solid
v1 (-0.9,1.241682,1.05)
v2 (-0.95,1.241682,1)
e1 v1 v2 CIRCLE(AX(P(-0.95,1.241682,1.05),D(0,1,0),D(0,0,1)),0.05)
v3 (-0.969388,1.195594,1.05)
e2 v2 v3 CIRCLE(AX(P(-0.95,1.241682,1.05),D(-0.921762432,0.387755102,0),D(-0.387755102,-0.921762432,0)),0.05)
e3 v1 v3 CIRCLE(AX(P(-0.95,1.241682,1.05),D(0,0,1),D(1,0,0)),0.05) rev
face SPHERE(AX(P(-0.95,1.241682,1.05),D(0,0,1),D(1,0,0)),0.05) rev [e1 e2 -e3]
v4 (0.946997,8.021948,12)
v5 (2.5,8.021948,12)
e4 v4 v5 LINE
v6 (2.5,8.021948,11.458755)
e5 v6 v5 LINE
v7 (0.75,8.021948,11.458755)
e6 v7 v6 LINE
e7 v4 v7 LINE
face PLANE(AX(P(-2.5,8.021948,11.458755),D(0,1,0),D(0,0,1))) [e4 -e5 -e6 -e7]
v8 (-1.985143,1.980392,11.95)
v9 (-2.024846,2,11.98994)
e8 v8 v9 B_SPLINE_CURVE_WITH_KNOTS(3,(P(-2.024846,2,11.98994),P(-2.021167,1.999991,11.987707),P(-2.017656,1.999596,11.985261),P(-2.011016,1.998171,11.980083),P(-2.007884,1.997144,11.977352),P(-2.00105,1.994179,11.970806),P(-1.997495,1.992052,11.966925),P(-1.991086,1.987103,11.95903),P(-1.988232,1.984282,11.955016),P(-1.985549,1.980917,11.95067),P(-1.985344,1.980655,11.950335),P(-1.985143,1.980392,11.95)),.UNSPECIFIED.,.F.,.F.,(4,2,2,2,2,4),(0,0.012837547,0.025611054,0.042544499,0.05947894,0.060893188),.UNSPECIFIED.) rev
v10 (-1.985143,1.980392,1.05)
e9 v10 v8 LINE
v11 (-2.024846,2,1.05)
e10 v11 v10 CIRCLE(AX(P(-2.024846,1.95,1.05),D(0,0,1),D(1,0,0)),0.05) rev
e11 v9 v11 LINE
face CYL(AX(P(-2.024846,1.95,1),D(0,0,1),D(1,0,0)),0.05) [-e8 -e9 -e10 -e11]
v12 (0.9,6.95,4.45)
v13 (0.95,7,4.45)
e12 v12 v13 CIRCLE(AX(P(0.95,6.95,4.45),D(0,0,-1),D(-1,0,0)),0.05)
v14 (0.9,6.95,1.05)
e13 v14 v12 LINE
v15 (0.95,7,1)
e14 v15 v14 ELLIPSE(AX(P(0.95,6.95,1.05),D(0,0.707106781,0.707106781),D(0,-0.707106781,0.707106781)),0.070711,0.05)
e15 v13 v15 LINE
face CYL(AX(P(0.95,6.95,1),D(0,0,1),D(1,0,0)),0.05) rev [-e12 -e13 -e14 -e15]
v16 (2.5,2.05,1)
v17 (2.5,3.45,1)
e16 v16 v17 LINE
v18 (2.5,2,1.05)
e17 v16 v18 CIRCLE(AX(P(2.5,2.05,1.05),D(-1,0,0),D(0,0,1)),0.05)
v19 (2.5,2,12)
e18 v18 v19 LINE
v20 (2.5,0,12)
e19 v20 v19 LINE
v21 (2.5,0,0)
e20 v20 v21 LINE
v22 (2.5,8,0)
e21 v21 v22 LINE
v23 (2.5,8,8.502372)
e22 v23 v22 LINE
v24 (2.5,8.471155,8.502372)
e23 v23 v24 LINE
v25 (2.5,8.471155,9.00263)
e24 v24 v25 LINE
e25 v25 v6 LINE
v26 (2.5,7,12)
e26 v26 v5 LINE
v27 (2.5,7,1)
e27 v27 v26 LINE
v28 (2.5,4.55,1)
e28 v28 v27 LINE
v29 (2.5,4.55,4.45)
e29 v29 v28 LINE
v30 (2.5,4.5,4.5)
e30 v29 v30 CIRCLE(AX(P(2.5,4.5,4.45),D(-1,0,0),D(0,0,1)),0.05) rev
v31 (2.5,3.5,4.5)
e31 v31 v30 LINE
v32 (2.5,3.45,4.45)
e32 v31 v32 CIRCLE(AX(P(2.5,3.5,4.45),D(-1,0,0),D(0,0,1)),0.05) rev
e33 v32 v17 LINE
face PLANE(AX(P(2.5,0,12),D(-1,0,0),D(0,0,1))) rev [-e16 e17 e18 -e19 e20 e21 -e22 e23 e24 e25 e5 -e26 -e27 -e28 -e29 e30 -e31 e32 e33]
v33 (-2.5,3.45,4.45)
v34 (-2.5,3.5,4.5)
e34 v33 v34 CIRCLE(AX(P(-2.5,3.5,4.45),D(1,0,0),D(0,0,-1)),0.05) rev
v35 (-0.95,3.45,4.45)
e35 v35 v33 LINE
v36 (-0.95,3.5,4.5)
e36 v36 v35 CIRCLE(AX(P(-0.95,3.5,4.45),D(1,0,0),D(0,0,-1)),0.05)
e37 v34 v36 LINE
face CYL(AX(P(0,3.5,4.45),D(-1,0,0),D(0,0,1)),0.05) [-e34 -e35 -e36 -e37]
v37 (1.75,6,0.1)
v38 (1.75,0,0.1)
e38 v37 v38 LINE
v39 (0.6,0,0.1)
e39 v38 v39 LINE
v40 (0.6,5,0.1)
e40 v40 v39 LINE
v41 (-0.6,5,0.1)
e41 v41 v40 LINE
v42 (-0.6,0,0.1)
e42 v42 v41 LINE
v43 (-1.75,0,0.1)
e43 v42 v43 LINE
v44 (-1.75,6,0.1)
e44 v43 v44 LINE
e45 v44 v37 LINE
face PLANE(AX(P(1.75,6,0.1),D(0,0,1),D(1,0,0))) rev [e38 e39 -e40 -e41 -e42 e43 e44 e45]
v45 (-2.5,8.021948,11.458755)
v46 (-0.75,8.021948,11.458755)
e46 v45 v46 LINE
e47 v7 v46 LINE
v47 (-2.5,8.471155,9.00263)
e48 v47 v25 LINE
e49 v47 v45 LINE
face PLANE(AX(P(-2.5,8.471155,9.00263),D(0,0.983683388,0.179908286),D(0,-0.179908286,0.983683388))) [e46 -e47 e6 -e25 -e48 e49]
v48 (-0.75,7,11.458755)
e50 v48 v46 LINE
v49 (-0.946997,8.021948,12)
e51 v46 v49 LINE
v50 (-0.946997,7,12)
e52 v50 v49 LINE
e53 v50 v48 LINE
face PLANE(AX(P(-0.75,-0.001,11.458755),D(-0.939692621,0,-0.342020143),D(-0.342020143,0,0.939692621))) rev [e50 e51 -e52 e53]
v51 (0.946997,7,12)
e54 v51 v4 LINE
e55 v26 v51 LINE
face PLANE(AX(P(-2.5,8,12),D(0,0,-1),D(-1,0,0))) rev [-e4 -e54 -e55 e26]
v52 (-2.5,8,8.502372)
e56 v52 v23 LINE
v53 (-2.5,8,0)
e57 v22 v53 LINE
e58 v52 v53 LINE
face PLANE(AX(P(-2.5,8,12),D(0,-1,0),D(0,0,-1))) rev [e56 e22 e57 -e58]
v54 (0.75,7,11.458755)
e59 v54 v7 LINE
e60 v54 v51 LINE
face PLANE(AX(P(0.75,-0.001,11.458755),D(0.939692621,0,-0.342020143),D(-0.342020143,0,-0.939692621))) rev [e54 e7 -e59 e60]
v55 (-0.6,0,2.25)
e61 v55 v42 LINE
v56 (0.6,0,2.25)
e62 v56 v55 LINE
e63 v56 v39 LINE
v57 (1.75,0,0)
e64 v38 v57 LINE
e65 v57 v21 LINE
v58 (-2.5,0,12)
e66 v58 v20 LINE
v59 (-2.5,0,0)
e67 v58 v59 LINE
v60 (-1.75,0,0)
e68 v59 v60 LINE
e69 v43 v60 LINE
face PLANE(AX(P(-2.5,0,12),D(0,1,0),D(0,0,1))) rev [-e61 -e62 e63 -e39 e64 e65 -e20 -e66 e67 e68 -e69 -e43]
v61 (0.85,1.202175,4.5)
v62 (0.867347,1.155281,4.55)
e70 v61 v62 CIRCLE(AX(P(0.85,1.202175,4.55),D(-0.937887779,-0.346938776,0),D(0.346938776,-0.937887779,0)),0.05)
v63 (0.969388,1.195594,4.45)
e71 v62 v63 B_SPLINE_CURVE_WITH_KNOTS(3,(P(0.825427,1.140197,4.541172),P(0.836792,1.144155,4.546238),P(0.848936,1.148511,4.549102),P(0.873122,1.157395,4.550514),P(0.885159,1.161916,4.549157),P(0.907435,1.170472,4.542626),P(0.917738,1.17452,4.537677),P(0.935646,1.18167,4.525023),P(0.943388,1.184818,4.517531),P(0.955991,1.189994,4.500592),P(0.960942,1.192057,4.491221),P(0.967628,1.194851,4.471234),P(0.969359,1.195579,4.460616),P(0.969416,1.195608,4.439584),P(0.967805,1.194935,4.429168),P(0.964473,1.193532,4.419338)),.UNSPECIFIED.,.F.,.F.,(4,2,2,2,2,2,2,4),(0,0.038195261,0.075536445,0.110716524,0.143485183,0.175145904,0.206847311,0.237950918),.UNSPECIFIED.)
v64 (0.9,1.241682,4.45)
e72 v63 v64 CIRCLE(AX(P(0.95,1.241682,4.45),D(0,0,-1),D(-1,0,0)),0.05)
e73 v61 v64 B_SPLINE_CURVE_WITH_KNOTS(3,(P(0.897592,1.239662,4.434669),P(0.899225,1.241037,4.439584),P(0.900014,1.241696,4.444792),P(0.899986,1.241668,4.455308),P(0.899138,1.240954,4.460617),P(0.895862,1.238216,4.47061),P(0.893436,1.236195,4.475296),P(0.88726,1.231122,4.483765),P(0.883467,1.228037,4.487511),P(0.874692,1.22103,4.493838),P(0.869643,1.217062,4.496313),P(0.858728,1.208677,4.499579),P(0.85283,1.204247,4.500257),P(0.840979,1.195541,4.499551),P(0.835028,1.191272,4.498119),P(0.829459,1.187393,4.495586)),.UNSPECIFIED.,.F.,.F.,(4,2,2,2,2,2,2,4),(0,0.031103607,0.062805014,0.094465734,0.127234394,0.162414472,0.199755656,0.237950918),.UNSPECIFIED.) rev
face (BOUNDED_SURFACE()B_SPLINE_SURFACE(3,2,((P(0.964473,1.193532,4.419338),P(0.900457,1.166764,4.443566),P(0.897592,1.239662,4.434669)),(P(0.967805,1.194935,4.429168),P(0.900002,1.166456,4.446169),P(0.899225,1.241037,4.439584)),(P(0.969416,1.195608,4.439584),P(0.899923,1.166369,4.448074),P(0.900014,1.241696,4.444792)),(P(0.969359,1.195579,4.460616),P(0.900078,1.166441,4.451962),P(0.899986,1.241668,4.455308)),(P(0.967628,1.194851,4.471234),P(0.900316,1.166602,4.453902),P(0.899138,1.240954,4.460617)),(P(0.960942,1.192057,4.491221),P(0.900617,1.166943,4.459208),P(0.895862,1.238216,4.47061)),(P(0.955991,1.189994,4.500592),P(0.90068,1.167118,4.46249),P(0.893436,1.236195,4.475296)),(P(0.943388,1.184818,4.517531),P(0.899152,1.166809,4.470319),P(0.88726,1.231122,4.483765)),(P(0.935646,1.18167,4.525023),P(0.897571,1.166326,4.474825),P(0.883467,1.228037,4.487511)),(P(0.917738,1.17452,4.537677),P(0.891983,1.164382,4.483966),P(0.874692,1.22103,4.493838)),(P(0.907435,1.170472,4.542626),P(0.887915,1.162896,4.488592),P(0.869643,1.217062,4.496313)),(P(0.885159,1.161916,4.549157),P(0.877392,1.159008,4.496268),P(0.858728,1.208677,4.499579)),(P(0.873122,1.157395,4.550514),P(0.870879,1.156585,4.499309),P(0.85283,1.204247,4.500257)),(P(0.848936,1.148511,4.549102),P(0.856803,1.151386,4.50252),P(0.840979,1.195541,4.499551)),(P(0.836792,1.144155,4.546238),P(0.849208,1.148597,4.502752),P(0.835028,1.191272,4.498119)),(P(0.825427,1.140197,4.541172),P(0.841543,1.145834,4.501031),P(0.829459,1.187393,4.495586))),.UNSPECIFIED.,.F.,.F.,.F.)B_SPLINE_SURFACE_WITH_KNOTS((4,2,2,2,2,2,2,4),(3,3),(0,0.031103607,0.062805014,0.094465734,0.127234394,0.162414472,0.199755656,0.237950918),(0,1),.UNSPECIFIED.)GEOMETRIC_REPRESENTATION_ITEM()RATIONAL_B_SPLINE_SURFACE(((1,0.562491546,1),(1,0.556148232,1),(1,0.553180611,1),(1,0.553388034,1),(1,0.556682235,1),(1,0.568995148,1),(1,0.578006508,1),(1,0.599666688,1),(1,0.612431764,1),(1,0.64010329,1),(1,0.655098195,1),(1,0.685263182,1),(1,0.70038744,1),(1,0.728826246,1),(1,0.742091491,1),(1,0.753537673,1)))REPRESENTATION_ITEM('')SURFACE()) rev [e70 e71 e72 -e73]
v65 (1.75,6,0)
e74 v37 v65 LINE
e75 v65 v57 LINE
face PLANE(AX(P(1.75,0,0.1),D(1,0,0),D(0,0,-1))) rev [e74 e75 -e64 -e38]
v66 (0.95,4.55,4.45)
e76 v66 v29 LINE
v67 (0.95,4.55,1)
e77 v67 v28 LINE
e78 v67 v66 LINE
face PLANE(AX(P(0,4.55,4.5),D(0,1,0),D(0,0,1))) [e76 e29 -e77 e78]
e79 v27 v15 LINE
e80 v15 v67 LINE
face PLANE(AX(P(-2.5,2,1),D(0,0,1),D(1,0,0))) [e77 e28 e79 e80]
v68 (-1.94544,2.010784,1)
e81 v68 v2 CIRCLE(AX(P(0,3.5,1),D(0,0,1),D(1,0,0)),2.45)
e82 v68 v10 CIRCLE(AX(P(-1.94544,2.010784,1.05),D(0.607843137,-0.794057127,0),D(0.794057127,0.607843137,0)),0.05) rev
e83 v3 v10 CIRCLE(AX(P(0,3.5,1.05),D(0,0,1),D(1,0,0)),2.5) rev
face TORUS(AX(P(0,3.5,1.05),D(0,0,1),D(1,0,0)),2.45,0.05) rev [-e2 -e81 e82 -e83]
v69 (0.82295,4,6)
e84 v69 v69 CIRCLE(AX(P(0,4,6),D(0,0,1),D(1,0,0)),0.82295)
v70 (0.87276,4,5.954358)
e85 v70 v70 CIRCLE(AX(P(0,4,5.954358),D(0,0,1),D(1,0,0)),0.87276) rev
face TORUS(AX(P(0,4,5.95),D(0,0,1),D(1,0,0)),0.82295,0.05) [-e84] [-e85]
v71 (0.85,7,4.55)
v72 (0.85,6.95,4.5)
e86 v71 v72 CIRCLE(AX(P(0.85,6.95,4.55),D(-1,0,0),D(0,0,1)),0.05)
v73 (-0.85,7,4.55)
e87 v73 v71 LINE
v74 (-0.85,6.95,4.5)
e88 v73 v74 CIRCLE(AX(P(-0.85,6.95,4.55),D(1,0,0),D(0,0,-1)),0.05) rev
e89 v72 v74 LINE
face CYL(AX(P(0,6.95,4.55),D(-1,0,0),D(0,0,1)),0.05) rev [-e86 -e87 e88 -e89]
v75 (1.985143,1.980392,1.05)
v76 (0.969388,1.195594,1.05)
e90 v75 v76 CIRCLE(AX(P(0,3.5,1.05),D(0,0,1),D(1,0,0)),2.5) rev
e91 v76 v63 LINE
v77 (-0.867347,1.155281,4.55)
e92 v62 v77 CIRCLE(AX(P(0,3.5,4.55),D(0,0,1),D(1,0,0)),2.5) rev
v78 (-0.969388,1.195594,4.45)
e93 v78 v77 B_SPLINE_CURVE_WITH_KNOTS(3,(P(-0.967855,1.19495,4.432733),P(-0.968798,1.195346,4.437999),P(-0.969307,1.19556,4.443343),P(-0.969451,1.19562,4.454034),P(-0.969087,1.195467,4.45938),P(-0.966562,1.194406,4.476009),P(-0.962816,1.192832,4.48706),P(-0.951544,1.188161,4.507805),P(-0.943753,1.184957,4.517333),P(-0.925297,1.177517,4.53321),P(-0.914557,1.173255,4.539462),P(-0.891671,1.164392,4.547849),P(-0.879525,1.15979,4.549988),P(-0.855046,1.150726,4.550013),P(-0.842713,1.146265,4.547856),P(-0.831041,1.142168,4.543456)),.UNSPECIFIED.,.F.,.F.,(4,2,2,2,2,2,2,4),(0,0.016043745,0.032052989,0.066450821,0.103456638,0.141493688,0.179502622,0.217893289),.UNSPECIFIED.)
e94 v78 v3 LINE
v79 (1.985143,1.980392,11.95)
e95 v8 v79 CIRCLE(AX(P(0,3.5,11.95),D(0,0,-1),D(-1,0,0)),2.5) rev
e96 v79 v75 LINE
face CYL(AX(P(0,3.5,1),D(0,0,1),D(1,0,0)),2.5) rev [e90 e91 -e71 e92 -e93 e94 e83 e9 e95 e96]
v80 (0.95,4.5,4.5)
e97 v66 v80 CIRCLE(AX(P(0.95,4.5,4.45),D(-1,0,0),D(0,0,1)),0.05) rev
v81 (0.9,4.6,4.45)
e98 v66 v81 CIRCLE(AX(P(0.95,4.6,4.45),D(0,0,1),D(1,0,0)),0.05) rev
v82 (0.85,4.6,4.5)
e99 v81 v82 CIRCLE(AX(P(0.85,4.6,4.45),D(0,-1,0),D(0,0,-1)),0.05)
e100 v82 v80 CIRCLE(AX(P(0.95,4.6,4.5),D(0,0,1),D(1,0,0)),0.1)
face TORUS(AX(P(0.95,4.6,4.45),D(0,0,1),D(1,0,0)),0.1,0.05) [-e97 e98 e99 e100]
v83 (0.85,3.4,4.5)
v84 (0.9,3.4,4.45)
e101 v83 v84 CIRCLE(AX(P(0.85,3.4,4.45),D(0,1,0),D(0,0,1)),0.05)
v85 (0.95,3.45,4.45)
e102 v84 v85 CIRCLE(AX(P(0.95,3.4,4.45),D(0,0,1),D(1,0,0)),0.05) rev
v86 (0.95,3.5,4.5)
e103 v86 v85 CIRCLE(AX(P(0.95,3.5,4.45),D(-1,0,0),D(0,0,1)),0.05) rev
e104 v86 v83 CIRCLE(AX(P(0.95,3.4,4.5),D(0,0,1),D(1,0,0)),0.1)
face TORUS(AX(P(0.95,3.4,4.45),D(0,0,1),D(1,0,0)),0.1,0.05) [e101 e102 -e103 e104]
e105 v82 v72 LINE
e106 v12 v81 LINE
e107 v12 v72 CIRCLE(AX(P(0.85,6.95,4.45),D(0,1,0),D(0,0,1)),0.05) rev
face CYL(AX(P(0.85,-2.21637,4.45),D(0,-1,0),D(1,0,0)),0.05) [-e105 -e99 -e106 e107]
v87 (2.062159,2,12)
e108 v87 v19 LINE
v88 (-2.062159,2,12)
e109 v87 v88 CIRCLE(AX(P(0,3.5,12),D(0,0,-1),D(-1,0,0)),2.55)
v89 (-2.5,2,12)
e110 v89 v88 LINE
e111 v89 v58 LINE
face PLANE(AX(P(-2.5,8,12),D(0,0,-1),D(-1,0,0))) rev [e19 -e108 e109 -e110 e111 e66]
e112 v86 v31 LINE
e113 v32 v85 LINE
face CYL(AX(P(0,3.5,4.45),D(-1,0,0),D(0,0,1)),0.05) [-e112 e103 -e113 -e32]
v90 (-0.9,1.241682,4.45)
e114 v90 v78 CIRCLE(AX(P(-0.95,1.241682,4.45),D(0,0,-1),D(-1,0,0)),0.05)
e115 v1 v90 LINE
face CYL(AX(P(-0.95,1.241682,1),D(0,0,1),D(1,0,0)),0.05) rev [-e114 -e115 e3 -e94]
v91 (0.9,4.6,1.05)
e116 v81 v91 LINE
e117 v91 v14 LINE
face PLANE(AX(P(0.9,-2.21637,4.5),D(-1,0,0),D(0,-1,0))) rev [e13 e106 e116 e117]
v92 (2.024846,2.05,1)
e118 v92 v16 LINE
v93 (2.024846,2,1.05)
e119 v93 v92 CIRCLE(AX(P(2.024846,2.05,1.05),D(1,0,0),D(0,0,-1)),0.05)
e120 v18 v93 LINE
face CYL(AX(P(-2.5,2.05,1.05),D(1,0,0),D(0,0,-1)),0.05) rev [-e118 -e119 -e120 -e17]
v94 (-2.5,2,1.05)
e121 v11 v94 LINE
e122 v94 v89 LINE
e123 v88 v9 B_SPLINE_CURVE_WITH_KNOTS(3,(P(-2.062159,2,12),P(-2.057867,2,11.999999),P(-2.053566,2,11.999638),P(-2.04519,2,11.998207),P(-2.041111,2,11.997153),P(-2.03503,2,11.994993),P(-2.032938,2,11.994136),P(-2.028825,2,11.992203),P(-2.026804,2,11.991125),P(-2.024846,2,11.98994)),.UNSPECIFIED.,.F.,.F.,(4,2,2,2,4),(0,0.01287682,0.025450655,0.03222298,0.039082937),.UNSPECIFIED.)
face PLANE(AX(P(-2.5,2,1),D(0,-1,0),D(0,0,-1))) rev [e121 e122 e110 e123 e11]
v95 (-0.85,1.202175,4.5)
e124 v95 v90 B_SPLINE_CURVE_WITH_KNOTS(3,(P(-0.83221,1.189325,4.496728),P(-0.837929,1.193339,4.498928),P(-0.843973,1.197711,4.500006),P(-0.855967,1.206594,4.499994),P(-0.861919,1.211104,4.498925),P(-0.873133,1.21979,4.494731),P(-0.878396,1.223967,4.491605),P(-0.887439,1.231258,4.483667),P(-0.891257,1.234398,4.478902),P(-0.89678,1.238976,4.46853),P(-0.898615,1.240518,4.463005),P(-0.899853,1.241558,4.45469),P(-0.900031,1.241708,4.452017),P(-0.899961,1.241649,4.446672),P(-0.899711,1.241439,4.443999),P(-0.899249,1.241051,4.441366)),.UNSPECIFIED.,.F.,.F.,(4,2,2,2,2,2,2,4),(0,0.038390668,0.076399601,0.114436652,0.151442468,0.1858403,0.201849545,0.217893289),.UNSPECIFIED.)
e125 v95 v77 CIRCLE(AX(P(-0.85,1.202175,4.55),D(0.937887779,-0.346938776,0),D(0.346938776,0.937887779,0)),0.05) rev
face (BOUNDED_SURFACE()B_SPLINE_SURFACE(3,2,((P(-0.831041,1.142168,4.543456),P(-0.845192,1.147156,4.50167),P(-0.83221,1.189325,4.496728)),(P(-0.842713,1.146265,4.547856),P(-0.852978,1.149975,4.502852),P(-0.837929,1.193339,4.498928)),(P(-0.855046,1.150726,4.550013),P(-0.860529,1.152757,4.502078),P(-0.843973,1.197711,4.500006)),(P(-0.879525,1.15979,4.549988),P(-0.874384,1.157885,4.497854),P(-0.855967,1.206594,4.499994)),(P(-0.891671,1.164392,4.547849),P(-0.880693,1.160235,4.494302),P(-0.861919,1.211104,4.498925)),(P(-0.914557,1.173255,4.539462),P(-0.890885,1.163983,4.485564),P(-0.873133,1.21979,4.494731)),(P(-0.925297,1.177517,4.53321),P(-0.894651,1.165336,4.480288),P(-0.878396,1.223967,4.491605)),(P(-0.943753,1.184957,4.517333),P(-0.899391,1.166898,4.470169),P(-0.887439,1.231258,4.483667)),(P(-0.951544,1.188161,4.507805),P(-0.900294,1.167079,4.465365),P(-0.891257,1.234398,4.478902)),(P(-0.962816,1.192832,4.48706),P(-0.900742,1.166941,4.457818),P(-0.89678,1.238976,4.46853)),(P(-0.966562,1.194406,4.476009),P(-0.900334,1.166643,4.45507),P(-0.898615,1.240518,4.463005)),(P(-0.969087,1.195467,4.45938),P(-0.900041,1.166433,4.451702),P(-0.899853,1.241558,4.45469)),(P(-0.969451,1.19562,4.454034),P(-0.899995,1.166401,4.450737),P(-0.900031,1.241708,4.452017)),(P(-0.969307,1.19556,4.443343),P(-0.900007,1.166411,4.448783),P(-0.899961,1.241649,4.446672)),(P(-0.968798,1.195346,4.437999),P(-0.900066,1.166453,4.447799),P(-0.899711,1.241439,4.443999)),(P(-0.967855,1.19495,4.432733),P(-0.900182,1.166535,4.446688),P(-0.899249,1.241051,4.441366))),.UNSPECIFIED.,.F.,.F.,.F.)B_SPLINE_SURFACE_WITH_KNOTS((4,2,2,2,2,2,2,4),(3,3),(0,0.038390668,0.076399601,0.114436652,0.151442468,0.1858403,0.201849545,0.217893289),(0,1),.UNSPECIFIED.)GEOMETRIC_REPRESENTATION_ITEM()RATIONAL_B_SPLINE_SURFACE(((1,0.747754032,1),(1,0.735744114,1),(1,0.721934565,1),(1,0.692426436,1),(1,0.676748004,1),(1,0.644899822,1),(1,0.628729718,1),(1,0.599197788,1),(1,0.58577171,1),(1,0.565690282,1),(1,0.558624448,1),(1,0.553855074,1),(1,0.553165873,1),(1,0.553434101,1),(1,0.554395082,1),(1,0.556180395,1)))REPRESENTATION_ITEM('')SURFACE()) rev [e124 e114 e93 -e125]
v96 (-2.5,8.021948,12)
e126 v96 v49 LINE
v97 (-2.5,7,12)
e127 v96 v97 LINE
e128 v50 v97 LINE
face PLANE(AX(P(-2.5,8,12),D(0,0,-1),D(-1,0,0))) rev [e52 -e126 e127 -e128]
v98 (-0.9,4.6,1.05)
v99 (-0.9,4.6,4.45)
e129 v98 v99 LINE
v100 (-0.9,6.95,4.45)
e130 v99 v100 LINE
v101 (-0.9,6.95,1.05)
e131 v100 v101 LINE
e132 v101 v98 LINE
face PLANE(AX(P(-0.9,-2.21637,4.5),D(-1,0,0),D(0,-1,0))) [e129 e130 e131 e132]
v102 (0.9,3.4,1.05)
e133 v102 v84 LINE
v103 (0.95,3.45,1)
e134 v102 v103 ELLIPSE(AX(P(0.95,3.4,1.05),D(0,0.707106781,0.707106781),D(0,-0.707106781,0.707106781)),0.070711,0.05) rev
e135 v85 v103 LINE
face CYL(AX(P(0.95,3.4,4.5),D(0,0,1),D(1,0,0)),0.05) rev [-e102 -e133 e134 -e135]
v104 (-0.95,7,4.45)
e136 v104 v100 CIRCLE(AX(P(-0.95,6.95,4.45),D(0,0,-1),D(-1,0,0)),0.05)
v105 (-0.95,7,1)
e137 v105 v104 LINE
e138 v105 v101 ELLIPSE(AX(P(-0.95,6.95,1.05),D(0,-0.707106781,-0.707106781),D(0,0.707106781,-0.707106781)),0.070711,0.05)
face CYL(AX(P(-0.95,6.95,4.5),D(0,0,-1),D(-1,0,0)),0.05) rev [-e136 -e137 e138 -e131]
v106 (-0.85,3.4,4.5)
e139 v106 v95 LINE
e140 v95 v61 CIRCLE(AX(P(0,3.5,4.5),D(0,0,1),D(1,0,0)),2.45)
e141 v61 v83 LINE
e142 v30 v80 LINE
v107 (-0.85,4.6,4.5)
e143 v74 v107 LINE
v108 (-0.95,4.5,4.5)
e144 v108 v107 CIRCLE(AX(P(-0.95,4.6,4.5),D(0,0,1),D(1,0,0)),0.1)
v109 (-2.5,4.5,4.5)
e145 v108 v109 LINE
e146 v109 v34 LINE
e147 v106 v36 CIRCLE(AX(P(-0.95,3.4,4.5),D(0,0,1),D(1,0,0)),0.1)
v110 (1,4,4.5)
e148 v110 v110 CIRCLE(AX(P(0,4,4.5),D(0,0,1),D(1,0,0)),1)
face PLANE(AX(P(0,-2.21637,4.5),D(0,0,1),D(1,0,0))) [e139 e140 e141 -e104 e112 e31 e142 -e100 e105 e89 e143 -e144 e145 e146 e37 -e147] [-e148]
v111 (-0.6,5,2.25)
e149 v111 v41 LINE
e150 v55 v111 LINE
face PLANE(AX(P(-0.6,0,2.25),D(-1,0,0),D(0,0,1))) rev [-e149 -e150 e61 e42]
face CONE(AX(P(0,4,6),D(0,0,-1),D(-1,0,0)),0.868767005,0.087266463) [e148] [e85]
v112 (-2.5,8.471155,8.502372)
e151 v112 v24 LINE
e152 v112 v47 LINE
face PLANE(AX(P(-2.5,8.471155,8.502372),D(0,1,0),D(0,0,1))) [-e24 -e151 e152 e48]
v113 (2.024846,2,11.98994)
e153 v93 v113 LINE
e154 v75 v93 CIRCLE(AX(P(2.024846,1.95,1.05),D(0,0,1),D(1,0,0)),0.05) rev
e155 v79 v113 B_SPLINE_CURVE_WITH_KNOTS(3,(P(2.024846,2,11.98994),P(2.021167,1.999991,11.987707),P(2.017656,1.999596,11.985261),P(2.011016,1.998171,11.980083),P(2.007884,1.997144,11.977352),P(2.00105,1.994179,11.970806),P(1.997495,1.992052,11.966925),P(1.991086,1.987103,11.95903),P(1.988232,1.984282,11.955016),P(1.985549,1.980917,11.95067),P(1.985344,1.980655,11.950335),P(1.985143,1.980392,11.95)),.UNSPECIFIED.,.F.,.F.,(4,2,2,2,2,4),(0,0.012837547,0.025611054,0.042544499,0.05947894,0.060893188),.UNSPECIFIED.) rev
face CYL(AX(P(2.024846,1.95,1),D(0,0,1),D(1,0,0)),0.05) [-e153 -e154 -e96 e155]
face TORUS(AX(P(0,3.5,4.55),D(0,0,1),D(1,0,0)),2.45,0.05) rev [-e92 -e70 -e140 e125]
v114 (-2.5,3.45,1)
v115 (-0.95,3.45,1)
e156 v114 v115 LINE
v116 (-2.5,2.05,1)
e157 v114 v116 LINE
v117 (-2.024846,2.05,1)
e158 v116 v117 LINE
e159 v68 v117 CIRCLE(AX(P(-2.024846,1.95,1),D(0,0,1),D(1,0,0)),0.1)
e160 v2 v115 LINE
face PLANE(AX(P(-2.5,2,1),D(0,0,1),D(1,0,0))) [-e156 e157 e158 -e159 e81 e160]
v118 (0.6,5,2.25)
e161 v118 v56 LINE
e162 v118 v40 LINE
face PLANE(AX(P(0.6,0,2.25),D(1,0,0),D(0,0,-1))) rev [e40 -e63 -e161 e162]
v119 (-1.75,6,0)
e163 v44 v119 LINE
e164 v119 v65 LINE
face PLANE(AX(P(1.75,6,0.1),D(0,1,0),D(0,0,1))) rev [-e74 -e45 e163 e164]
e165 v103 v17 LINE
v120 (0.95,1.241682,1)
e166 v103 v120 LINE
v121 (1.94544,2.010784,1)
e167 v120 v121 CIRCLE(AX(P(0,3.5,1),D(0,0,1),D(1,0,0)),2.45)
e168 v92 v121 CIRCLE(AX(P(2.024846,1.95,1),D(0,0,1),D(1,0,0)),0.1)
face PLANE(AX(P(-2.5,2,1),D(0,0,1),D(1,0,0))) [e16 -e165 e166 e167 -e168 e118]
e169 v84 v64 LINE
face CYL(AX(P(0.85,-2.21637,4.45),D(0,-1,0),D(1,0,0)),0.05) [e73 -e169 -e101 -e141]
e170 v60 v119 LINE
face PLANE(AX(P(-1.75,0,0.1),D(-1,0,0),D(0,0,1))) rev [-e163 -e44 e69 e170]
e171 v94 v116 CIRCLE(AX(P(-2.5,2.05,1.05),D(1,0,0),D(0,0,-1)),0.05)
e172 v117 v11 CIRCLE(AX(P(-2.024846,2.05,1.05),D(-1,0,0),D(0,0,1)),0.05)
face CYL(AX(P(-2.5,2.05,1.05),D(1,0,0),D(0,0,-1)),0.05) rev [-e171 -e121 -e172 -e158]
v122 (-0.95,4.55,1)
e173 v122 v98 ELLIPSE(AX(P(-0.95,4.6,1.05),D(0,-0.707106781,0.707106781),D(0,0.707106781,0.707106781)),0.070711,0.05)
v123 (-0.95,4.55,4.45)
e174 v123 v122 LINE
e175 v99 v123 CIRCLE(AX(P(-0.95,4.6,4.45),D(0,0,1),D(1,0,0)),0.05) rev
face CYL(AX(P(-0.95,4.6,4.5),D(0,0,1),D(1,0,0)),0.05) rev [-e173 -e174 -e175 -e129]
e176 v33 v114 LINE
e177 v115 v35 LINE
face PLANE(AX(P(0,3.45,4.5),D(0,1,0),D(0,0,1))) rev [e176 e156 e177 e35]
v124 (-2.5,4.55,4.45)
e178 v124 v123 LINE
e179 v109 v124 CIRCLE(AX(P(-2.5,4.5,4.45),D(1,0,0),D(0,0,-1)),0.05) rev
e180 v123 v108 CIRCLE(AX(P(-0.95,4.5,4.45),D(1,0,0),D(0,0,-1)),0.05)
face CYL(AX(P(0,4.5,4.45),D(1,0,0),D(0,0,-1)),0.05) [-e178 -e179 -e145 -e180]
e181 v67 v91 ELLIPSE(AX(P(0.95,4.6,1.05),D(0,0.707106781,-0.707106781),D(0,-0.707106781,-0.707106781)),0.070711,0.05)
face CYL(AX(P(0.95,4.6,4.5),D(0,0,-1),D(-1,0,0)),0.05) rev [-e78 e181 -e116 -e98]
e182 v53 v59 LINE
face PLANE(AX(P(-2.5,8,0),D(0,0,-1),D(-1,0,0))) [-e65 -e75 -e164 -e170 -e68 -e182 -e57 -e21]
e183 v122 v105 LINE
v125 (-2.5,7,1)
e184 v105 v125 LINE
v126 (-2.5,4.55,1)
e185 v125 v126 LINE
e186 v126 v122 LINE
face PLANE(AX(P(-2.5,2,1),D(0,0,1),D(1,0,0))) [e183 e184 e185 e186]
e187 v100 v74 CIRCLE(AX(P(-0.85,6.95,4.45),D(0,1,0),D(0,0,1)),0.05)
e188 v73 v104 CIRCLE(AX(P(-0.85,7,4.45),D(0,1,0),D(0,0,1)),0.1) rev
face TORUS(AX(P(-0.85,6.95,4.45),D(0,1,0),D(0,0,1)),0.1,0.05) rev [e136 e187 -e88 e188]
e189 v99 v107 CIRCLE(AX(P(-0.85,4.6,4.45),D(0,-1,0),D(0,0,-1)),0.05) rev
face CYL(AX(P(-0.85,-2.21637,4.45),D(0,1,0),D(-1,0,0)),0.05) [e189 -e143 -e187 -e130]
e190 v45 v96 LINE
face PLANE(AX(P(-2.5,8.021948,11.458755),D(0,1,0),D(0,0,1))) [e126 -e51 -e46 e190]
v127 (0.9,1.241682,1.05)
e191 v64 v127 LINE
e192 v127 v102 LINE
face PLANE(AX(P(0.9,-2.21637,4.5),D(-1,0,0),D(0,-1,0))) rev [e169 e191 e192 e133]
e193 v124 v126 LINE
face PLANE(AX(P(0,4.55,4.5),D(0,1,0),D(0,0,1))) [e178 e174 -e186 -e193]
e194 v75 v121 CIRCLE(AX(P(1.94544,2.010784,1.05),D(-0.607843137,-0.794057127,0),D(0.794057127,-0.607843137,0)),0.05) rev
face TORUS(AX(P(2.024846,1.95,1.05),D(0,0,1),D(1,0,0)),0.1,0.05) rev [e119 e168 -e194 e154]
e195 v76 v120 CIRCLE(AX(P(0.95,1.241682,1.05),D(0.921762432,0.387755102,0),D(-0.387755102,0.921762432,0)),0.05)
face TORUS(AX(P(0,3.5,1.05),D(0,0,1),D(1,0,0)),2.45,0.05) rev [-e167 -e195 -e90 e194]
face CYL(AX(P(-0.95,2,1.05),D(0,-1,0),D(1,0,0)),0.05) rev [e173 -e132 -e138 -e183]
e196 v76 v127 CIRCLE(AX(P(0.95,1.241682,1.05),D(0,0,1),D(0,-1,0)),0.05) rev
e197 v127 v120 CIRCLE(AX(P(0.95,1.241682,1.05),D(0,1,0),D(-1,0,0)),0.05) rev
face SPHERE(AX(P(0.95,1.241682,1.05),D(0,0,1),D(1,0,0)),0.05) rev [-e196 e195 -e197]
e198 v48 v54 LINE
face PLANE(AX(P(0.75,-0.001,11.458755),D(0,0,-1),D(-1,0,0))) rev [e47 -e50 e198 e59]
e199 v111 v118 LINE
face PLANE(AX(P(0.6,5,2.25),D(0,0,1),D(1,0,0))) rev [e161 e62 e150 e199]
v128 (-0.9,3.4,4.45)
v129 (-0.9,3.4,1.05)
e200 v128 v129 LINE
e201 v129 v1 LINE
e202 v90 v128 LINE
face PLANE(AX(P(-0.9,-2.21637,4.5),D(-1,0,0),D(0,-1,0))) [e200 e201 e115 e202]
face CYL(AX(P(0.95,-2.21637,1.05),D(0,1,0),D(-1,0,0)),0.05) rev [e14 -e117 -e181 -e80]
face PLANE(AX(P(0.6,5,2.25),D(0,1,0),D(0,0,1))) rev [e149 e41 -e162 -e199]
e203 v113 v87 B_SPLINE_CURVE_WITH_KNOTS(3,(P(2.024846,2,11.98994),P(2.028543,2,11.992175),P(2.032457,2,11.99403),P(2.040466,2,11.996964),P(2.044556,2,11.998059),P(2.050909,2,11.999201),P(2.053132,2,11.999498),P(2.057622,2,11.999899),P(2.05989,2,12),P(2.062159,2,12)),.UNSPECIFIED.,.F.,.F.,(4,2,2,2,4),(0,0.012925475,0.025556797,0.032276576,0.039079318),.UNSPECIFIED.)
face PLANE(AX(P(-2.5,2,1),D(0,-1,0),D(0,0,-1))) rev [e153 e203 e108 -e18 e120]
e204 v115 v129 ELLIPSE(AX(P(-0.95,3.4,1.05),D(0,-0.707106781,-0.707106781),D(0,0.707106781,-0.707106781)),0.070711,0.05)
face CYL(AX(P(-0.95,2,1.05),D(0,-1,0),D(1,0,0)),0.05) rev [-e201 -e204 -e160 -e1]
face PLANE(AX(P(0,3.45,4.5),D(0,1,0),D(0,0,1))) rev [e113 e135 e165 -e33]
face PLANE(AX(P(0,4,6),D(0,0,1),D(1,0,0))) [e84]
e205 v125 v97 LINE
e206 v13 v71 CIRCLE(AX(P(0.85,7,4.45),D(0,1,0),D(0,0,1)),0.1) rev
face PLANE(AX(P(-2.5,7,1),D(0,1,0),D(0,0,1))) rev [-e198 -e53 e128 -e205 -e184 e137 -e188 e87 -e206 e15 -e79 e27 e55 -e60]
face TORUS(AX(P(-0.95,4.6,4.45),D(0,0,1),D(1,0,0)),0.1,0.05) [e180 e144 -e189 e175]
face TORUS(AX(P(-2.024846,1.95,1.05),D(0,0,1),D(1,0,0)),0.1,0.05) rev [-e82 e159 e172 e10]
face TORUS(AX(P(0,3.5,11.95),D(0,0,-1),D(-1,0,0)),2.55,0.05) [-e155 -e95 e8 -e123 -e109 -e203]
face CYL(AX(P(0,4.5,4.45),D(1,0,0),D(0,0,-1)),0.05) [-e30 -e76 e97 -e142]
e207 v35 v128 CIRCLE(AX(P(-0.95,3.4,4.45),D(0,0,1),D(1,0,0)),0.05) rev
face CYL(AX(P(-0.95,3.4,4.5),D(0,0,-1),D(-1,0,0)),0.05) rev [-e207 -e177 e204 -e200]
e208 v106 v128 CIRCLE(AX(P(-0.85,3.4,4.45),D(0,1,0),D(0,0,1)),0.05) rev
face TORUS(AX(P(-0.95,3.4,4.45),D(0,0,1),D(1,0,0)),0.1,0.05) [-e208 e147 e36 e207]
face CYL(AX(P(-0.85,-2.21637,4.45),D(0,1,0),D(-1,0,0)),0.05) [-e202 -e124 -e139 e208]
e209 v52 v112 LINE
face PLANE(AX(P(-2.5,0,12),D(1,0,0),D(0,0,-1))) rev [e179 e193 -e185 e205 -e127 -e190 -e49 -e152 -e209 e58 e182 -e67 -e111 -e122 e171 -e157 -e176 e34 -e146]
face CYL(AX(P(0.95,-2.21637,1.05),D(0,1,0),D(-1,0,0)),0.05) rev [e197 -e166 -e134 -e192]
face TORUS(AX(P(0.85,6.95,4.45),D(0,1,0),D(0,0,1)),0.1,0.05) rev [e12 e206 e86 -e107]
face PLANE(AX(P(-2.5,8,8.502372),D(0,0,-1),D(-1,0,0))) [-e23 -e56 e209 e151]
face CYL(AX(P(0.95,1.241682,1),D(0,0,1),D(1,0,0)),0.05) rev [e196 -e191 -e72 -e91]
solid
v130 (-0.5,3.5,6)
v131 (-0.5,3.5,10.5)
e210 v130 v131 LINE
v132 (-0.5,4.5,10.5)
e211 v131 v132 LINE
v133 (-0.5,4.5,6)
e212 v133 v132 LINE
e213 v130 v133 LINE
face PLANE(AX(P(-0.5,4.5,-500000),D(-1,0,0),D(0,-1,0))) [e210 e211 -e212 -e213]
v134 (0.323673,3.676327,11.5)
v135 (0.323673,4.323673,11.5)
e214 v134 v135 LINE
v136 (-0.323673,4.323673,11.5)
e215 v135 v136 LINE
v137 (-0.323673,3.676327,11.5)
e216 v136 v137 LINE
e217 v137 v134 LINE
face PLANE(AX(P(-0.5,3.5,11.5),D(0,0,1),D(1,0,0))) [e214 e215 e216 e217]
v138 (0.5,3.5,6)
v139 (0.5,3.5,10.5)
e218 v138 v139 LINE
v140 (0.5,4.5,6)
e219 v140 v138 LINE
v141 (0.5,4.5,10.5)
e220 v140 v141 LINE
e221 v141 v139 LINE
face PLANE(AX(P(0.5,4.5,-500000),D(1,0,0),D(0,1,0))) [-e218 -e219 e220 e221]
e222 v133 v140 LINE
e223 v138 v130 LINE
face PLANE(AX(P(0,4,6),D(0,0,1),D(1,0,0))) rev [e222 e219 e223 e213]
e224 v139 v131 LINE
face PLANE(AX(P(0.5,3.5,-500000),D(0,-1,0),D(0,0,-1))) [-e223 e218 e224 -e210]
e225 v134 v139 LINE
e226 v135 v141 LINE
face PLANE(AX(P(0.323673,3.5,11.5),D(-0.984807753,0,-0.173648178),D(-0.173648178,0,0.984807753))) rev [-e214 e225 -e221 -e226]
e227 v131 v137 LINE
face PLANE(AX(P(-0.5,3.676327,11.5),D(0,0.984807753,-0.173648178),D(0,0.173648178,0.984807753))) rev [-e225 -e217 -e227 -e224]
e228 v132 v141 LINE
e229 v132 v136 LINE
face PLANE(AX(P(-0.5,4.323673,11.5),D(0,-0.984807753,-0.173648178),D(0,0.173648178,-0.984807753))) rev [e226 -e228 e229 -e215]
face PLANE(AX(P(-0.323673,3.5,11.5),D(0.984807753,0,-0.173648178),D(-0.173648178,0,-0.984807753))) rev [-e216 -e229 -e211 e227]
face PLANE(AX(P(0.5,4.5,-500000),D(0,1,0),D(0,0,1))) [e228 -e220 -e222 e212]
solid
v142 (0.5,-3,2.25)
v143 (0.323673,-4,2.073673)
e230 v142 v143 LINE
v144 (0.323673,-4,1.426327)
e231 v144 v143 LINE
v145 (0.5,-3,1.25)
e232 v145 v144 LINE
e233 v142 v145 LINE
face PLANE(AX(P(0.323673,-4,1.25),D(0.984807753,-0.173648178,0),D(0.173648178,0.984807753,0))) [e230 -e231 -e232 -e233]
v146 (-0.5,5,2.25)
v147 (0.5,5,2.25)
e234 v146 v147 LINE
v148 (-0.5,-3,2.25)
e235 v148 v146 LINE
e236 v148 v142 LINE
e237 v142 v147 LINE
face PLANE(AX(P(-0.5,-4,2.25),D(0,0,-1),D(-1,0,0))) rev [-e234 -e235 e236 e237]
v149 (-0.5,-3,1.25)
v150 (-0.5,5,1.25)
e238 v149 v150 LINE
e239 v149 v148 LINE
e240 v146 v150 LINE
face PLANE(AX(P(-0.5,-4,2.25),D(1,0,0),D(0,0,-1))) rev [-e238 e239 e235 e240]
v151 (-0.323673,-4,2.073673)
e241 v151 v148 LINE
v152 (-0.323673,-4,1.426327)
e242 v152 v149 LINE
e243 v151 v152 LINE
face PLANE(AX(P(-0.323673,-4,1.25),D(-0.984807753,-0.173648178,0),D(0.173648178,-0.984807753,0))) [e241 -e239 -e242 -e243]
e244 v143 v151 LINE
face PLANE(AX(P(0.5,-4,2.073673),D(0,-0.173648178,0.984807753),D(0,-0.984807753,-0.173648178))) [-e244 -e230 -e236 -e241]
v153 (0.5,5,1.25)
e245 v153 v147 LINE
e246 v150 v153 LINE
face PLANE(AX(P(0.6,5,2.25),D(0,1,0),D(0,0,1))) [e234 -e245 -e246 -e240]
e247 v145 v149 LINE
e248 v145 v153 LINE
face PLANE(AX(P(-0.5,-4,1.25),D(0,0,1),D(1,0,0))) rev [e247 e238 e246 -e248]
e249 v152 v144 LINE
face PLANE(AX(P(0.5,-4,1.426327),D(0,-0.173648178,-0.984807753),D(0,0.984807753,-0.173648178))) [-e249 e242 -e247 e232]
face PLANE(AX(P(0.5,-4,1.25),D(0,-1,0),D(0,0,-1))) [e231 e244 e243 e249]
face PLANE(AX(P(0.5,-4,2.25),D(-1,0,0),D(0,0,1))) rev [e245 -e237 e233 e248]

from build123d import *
from OCP.BRepFilletAPI import BRepFilletAPI_MakeChamfer

# Parameters (mm, degrees)
SKETCH_1_W                   = 5
SKETCH_1_H                   = 8
EXTRUDE_1_DEPTH              = 12
SKETCH_2_W                   = 5
SKETCH_2_H                   = 5
CUT_EXTRUDE_2_DEPTH          = 11
SKETCH_5_R                   = 2.5
CUT_EXTRUDE_3_DEPTH          = 11
EXTRUDE_START                = 3.5
SKETCH_13_W                  = 1.8
SKETCH_13_H                  = 1.1
SKETCH_13_H_2                = 2.45
SKETCH_13_W_2                = 1.6
EXTRUDE_13_DEPTH             = 3.5
SKETCH_14_R                  = 1
EXTRUDE_14_DEPTH             = 1.5
CHAMFER_1_SIZE               = 1.5
CHAMFER_1_SIZE_2             = 0.131232995
EXTRUDE_15_DEPTH             = 5
CUT_EXTRUDE_16_REACH         = 16.649
SKETCH_17_W                  = 1.2
SKETCH_17_H                  = 5
CUT_EXTRUDE_17_DEPTH         = 2.25
SKETCH_18_W                  = 3.5
SKETCH_18_H                  = 6
CUT_EXTRUDE_18_DEPTH         = 0.1
EXTRUDE_19_REACH             = 16.9
SKETCH_6_W                   = 1
SKETCH_6_H                   = 1
SKETCH_19_W                  = 1
SKETCH_19_H                  = 1
CUT_EXTRUDE_20_DEPTH         = 0.5
EXTRUDE_22_REACH             = 16.9
SKETCH_9_W                   = 1
SKETCH_9_H                   = 1
EXTRUDE_22_DIRECTION_2_DEPTH = 4
CHAMFER_2_SIZE               = 1
CHAMFER_2_SIZE2              = 0.176326981
CHAMFER_3_SIZE               = 1
CHAMFER_3_SIZE2              = 0.176326981
FILLET_3_R                   = 0.05


with BuildPart() as part:
    # Эскиз1 → Вытянуть1 (new body)
    with BuildSketch(Plane.XY):
        with Locations((0, 4)):
            Rectangle(SKETCH_1_W, SKETCH_1_H)
    extrude(amount=EXTRUDE_1_DEPTH)

    # Эскиз2 → Вытянуть2 (cut)
    with BuildSketch(Plane.XY.offset(12)):
        with Locations((0, 4.5)):
            Rectangle(SKETCH_2_W, SKETCH_2_H)
    extrude(amount=-CUT_EXTRUDE_2_DEPTH, mode=Mode.SUBTRACT)

    # Эскиз5 → Вытянуть3 (cut)
    with BuildSketch(Plane.XY.offset(12)):
        with Locations((0, 3.5)):
            Circle(SKETCH_5_R)
    extrude(amount=-CUT_EXTRUDE_3_DEPTH, mode=Mode.SUBTRACT)

    # Эскиз13 → Вытянуть13 (add)
    with BuildSketch(Plane.XY.offset(1).offset(EXTRUDE_START)):
        with Locations((0, 4)):
            Rectangle(SKETCH_13_W, SKETCH_13_H)
        with Locations((0, 5.775)):
            Rectangle(SKETCH_13_W, SKETCH_13_H_2)
        with Locations((-1.7, 4)):
            Rectangle(SKETCH_13_W_2, SKETCH_13_H)
        with BuildLine():
            ThreePointArc((-0.9, 1.167619242), (-0.457737974, 1.042262026), (0, 1))
            ThreePointArc((0, 1), (0.457737974, 1.042262026), (0.9, 1.167619242))
            Line((0.9, 1.167619242), (0.9, 3.45))
            Line((0.9, 3.45), (-0.9, 3.45))
            Line((-0.9, 3.45), (-0.9, 1.167619242))
        make_face()
        with Locations((1.7, 4)):
            Rectangle(SKETCH_13_W_2, SKETCH_13_H)
    extrude(amount=-EXTRUDE_13_DEPTH)

    # Эскиз14 → Вытянуть14 (add)
    with BuildSketch(Plane.XY.offset(4.5)):
        with Locations((0, 4)):
            Circle(SKETCH_14_R)
    extrude(amount=EXTRUDE_14_DEPTH)

    # Фаска1
    # the kernel refuses this chamfer: 1.5, 0.131232995 mm, written as the material it takes off along each edge
    with BuildSketch(Plane(origin=(0, 4, 6), x_dir=(1, 0, 0), z_dir=(0, -1, 0))) as chamfer_1_piece_1_section:
        Polygon((1, -CHAMFER_1_SIZE), (1 - CHAMFER_1_SIZE_2 * 1.0000000022, 0), (1, 0), align=None)
    chamfer_1_piece_1 = revolve(axis=Axis((0, 4, 6), (0, 0, 1)), mode=Mode.PRIVATE)
    chamfer_1_piece_1 = split(chamfer_1_piece_1, bisect_by=Plane(origin=(-0.941450204, 4, 4.5), z_dir=(0, 0, 1)), keep=Keep.TOP, mode=Mode.PRIVATE)
    add(chamfer_1_piece_1, mode=Mode.SUBTRACT)

    # Эскиз15 → Вытянуть15 (add)
    with BuildSketch(Plane(origin=(2.5, 0, 0), x_dir=(0, 0, -1), z_dir=(1, 0, 0))):
        Polygon((-12, 8), (-8.502371568, 8), (-8.502371568, 8.471155216), (-9.002629656, 8.471155216), (-11.45875482, 8.021948415), (-12, 8.021948415), align=None)
    extrude(amount=-EXTRUDE_15_DEPTH)

    # Эскиз16 → Вытянуть16 (cut, up to next)
    with BuildSketch(Plane(origin=(0, 8.021948415, 0), x_dir=(1, 0, 0), z_dir=(0, 1, 0)), mode=Mode.PRIVATE) as cut_extrude_16_sk1:
        Polygon((0.75, -11.45875482), (-0.75, -11.45875482), (-0.946997135, -12), (0.946997135, -12), align=None)
    cut_extrude_16_tool1 = extrude(cut_extrude_16_sk1.sketch, amount=-CUT_EXTRUDE_16_REACH, mode=Mode.PRIVATE) & part.part
    add(cut_extrude_16_tool1.solids().sort_by_distance((0, 8.021948, 11.739849))[0], mode=Mode.SUBTRACT)

    # Эскиз17 → Вытянуть17 (cut)
    with BuildSketch(Plane(origin=(0, 0, 0), x_dir=(-1, 0, 0), z_dir=(0, 0, -1))):
        with Locations((0, 2.5)):
            Rectangle(SKETCH_17_W, SKETCH_17_H)
    extrude(amount=-CUT_EXTRUDE_17_DEPTH, mode=Mode.SUBTRACT)

    # Эскиз18 → Вытянуть18 (cut)
    with BuildSketch(Plane(origin=(0, 0, 0), x_dir=(-1, 0, 0), z_dir=(0, 0, -1))):
        with Locations((0, 3)):
            Rectangle(SKETCH_18_W, SKETCH_18_H)
    extrude(amount=-CUT_EXTRUDE_18_DEPTH, mode=Mode.SUBTRACT)


with BuildPart() as body_2:

    # Эскиз6 → Вытянуть19 (new, up to next)
    with BuildSketch(Plane.XY.offset(12), mode=Mode.PRIVATE) as extrude_19_sk1:
        with Locations((0, 4)):
            Rectangle(SKETCH_6_W, SKETCH_6_H)
    extrude_19_tool1 = extrude(extrude_19_sk1.sketch, amount=-EXTRUDE_19_REACH, mode=Mode.PRIVATE) - part.part
    add(extrude_19_tool1.solids().sort_by_distance((0, 4, 12))[0])

    # Эскиз19 → Вытянуть20 (cut)
    with BuildSketch(Plane.XY.offset(12)):
        with Locations((0, 4)):
            Rectangle(SKETCH_19_W, SKETCH_19_H)
    extrude(amount=-CUT_EXTRUDE_20_DEPTH, mode=Mode.SUBTRACT)

    # Фаска2: one chamfer whose edges measure the first distance from different faces: ONE call of the kernel's chamfer builder (chamfer() names one face for all edges)
    chamfer_2_edges_1 = [body_2.edges().sort_by_distance(p)[0] for p in [
        (-0.5, 4, 11.5),
    ]]
    chamfer_2_side_1 = [body_2.faces().sort_by_distance(p)[0] for p in [
        (-0.5, 4, 8.75),
    ]]
    chamfer_2_edges_2 = [body_2.edges().sort_by_distance(p)[0] for p in [
        (0, 4.5, 11.5),
    ]]
    chamfer_2_side_2 = [body_2.faces().sort_by_distance(p)[0] for p in [
        (0, 4.5, 8.75),
    ]]
    chamfer_2_edges_3 = [body_2.edges().sort_by_distance(p)[0] for p in [
        (0.5, 4, 11.5),
    ]]
    chamfer_2_side_3 = [body_2.faces().sort_by_distance(p)[0] for p in [
        (0.5, 4, 8.75),
    ]]
    chamfer_2_edges_4 = [body_2.edges().sort_by_distance(p)[0] for p in [
        (0, 3.5, 11.5),
    ]]
    chamfer_2_side_4 = [body_2.faces().sort_by_distance(p)[0] for p in [
        (0, 3.5, 8.75),
    ]]
    chamfer_2 = BRepFilletAPI_MakeChamfer(body_2.part.solid().wrapped)
    for e in chamfer_2_edges_1:
        chamfer_2.Add(CHAMFER_2_SIZE, CHAMFER_2_SIZE2, e.wrapped, chamfer_2_side_1[0].wrapped)  # the first distance lies on this face
    for e in chamfer_2_edges_2:
        chamfer_2.Add(CHAMFER_2_SIZE, CHAMFER_2_SIZE2, e.wrapped, chamfer_2_side_2[0].wrapped)  # the first distance lies on this face
    for e in chamfer_2_edges_3:
        chamfer_2.Add(CHAMFER_2_SIZE, CHAMFER_2_SIZE2, e.wrapped, chamfer_2_side_3[0].wrapped)  # the first distance lies on this face
    for e in chamfer_2_edges_4:
        chamfer_2.Add(CHAMFER_2_SIZE, CHAMFER_2_SIZE2, e.wrapped, chamfer_2_side_4[0].wrapped)  # the first distance lies on this face
    add(Compound.cast(chamfer_2.Shape()), mode=Mode.REPLACE)


with BuildPart() as body_3:

    # Эскиз9 → Вытянуть22 (new, up to next)
    with BuildSketch(Plane.XZ, mode=Mode.PRIVATE) as extrude_22_sk1:
        with Locations((0, 1.75)):
            Rectangle(SKETCH_9_W, SKETCH_9_H)
    extrude_22_tool1 = extrude(extrude_22_sk1.sketch, amount=-EXTRUDE_22_REACH, mode=Mode.PRIVATE) - part.part
    add(extrude_22_tool1.solids().sort_by_distance((0, 0, 1.75))[0])

    # Эскиз9 → Вытянуть22 direction 2 (add)
    with BuildSketch(Plane.XZ):
        with Locations((0, 1.75)):
            Rectangle(SKETCH_9_W, SKETCH_9_H)
    extrude(amount=EXTRUDE_22_DIRECTION_2_DEPTH)

    # Фаска3: one chamfer whose edges measure the first distance from different faces: ONE call of the kernel's chamfer builder (chamfer() names one face for all edges)
    chamfer_3_edges_1 = [body_3.edges().sort_by_distance(p)[0] for p in [
        (-0.5, -4, 1.75),
    ]]
    chamfer_3_side_1 = [body_3.faces().sort_by_distance(p)[0] for p in [
        (-0.5, 0.5, 1.75),
    ]]
    chamfer_3_edges_2 = [body_3.edges().sort_by_distance(p)[0] for p in [
        (0, -4, 1.25),
    ]]
    chamfer_3_side_2 = [body_3.faces().sort_by_distance(p)[0] for p in [
        (0, 0.5, 1.25),
    ]]
    chamfer_3_edges_3 = [body_3.edges().sort_by_distance(p)[0] for p in [
        (0.5, -4, 1.75),
    ]]
    chamfer_3_side_3 = [body_3.faces().sort_by_distance(p)[0] for p in [
        (0.5, 0.5, 1.75),
    ]]
    chamfer_3_edges_4 = [body_3.edges().sort_by_distance(p)[0] for p in [
        (0, -4, 2.25),
    ]]
    chamfer_3_side_4 = [body_3.faces().sort_by_distance(p)[0] for p in [
        (0, 0.5, 2.25),
    ]]
    chamfer_3 = BRepFilletAPI_MakeChamfer(body_3.part.solid().wrapped)
    for e in chamfer_3_edges_1:
        chamfer_3.Add(CHAMFER_3_SIZE, CHAMFER_3_SIZE2, e.wrapped, chamfer_3_side_1[0].wrapped)  # the first distance lies on this face
    for e in chamfer_3_edges_2:
        chamfer_3.Add(CHAMFER_3_SIZE, CHAMFER_3_SIZE2, e.wrapped, chamfer_3_side_2[0].wrapped)  # the first distance lies on this face
    for e in chamfer_3_edges_3:
        chamfer_3.Add(CHAMFER_3_SIZE, CHAMFER_3_SIZE2, e.wrapped, chamfer_3_side_3[0].wrapped)  # the first distance lies on this face
    for e in chamfer_3_edges_4:
        chamfer_3.Add(CHAMFER_3_SIZE, CHAMFER_3_SIZE2, e.wrapped, chamfer_3_side_4[0].wrapped)  # the first distance lies on this face
    add(Compound.cast(chamfer_3.Shape()), mode=Mode.REPLACE)


with BuildPart() as part_1:
    add(part.part)

    # Скругление3
    fillet_3_edges = [part_1.edges().sort_by_distance(p)[0] for p in [
        (-2.25, 2, 1),
        (2.25, 2, 1),
        (0, 1, 12),
        (-1.508547126, 1.506438973, 1),
        (2, 2, 6.5),
        (-2, 2, 6.5),
        (1.508547126, 1.506438973, 1),
        (-0.9, 5.775, 4.5),
        (-0.9, 7, 2.75),
        (-1.7, 4.55, 4.5),
        (-0.9, 4.55, 2.75),
        (-0.9, 2.308809621, 4.5),
        (-0.9, 3.45, 2.75),
        (-0.9, 1.167619242, 2.75),
        (0.9, 2.308809621, 1),
        (0.9, 1.167619242, 2.75),
        (0.9, 3.45, 2.75),
        (1.7, 4.55, 4.5),
        (0.9, 5.775, 1),
        (0.9, 4.55, 2.75),
        (0.9, 7, 2.75),
        (-1.7, 3.45, 4.5),
        (0, 1, 4.5),
        (0.9, 2.308809621, 4.5),
        (1.7, 3.45, 4.5),
        (0.9, 5.775, 4.5),
        (0, 7, 4.5),
        (-0.9, 5.775, 1),
        (-0.9, 2.308809621, 1),
        (-0.868767005, 4, 6),
    ]]
    fillet(fillet_3_edges, radius=FILLET_3_R)


solid = Compound([body_2.part, body_3.part, part_1.part])
